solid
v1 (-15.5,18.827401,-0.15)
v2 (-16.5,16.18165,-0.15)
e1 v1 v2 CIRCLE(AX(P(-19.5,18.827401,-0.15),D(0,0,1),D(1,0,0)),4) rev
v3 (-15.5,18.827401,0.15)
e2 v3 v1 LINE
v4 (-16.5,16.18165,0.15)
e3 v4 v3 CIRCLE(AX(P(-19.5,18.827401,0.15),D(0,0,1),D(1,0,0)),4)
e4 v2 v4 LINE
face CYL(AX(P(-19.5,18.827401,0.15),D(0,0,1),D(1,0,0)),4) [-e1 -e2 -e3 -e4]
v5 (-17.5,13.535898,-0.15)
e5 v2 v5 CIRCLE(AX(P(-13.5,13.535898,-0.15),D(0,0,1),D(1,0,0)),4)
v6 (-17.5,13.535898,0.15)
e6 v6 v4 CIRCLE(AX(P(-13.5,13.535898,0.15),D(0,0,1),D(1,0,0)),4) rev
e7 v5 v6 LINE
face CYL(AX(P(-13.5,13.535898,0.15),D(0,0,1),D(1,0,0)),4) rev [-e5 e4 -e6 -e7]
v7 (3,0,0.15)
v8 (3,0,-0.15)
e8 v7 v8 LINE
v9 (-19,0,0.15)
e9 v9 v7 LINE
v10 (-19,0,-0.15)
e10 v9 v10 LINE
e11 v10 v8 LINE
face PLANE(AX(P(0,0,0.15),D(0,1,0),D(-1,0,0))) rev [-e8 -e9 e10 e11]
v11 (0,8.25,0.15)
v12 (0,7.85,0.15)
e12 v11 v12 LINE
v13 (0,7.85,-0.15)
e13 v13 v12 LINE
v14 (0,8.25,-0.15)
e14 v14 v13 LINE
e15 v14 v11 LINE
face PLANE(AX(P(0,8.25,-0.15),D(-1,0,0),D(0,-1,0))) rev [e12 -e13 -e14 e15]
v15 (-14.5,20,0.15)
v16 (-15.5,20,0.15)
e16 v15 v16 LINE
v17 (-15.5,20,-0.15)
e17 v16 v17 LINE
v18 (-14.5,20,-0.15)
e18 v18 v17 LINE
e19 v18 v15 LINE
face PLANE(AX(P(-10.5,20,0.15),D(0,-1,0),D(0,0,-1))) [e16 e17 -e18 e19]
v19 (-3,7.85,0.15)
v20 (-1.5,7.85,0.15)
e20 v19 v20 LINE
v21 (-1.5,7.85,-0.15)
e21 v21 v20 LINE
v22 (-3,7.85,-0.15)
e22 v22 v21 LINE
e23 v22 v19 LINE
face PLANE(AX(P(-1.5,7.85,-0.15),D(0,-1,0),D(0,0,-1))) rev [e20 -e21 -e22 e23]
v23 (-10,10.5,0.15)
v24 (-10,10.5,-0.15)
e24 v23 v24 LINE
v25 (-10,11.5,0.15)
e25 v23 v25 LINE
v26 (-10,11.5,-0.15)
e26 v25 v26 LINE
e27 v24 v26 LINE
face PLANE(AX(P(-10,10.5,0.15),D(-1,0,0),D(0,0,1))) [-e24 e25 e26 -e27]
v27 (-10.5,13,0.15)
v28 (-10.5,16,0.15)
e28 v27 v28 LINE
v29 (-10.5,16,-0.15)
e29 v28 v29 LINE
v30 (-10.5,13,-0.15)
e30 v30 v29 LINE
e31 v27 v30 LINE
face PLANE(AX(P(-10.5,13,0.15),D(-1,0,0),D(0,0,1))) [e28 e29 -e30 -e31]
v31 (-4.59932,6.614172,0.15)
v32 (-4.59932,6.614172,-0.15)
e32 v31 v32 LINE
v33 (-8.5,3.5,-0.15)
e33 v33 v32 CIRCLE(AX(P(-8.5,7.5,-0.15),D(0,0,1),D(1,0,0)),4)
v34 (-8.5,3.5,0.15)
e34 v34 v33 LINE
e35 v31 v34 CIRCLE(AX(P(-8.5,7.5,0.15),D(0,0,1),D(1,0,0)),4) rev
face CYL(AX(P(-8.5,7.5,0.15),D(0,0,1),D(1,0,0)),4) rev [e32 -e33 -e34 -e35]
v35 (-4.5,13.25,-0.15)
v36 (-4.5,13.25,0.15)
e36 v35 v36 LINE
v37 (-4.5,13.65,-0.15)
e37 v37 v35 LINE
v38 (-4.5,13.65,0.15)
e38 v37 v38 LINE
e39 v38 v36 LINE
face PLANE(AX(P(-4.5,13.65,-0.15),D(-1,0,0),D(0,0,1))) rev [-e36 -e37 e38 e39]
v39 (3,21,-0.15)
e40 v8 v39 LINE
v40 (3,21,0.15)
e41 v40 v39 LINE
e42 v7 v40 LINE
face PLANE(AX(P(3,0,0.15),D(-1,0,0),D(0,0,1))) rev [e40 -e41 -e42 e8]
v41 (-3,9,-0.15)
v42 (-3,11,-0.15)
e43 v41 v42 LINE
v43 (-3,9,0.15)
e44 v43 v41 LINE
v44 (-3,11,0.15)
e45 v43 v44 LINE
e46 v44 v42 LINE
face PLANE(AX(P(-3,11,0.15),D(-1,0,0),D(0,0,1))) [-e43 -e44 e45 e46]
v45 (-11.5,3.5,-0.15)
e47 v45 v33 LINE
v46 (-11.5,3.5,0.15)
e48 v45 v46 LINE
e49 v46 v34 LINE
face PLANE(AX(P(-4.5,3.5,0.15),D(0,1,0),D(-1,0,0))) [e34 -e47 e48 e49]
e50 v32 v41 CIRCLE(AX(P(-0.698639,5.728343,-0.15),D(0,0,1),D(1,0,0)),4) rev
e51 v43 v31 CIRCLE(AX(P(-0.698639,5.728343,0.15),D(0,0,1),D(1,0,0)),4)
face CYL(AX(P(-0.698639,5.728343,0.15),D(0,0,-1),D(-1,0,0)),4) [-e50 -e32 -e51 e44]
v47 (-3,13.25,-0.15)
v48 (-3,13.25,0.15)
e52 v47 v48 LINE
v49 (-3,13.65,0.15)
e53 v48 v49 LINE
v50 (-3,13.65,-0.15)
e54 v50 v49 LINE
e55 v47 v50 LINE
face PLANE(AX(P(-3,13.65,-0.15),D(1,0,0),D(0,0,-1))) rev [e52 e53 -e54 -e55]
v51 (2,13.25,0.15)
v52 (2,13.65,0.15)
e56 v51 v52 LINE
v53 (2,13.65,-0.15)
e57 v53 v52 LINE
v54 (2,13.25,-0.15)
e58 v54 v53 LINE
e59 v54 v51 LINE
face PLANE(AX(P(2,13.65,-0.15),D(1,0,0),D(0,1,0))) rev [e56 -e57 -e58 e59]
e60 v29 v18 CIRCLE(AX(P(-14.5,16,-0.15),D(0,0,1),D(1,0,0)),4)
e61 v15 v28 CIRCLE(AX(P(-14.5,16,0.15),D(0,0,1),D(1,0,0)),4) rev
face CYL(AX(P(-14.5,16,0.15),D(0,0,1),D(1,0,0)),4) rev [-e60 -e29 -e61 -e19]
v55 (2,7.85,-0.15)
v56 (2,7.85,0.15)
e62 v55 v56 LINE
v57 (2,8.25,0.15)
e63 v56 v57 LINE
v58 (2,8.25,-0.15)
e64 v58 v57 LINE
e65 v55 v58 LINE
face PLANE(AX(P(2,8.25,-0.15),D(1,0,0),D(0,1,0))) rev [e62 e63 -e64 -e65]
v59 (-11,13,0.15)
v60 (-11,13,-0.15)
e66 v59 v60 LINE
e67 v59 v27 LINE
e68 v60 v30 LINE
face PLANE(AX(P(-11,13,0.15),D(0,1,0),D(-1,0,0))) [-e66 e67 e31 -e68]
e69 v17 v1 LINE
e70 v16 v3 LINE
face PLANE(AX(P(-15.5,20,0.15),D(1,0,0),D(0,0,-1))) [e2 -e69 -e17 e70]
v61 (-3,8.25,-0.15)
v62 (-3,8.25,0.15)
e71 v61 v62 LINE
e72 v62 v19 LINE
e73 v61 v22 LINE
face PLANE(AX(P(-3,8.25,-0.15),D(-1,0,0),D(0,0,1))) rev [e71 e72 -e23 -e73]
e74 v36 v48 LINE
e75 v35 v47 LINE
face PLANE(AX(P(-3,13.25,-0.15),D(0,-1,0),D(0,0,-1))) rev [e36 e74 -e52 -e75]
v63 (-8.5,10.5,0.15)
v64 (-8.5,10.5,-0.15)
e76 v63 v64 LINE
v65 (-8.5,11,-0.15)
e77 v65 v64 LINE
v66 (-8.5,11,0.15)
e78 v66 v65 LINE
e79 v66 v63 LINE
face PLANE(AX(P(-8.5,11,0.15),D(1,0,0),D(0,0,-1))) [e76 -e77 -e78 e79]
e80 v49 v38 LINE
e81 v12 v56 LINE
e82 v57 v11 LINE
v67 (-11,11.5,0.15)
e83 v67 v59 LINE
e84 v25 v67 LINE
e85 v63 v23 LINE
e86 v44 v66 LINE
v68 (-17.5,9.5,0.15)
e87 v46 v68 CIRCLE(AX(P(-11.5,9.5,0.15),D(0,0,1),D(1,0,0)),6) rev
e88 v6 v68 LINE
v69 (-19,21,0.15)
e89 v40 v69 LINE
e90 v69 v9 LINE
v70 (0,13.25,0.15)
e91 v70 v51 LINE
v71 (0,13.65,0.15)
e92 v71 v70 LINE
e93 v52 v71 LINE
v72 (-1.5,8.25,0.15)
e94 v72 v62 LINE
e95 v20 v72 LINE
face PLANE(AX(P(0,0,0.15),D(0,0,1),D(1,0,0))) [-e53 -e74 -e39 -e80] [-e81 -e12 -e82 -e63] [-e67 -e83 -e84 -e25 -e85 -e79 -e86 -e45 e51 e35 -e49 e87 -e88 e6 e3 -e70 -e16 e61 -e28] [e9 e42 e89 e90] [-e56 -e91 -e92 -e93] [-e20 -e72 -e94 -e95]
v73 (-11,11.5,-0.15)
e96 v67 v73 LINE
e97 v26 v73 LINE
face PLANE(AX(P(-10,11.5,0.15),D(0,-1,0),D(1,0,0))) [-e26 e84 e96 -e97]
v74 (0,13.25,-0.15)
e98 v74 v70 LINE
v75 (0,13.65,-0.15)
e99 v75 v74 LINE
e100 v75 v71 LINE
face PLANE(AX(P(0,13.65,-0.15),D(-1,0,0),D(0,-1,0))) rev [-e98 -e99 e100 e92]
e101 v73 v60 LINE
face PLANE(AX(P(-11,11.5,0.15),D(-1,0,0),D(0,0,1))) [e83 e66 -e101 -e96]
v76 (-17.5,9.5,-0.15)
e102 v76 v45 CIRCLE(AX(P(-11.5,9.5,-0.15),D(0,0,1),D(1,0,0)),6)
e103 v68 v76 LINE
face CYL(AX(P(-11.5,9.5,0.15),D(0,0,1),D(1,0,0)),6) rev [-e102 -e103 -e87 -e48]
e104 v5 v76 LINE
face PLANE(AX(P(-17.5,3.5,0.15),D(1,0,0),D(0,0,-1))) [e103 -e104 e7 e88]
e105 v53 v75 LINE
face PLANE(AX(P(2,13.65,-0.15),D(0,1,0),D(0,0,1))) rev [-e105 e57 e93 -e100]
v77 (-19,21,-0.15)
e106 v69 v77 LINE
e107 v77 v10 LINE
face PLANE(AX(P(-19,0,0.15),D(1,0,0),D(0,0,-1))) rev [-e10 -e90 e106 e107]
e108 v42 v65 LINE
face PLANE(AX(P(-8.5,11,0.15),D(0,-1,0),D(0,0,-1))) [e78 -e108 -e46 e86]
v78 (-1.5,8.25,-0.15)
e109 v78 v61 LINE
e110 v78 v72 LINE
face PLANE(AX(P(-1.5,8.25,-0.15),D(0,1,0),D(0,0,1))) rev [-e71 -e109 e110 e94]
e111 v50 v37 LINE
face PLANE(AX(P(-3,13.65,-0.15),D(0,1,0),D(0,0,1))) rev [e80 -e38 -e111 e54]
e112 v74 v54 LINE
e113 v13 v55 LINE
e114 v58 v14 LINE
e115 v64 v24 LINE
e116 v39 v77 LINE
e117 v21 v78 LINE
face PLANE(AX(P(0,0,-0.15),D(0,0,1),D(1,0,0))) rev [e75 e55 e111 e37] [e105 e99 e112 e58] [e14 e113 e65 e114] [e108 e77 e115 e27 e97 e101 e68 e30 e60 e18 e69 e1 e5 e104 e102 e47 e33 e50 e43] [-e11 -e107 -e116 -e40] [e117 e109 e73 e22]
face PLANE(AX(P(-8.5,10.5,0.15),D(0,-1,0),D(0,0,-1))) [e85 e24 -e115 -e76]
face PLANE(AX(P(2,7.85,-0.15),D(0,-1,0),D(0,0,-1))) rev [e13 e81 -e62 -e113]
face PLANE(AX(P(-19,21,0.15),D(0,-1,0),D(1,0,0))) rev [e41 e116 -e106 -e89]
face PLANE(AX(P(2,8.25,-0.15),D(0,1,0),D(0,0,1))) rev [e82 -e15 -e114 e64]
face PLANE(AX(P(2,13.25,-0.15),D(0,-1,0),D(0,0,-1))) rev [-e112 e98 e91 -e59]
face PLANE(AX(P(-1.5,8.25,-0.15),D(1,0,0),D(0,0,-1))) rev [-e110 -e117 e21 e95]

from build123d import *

# Parameters (mm, degrees)
BOSS_EXTRUDE1_DEPTH = 0.15
FILLET3_R           = 6
FILLET4_R           = 4
FILLET5_R           = 4
FILLET7_R           = 4
SKETCH3_W           = 2
SKETCH3_H           = 0.4
SKETCH3_W_2         = 1.5
CUT_EXTRUDE1_DEPTH  = 29.321193478


with BuildPart() as part:
    # Sketch1 → Boss-Extrude1 (new, symmetric)
    with BuildSketch(Plane.XY):
        Polygon((0, 0), (-19, 0), (-19, 21), (0, 21), (3, 21), (3, 0), align=None)
        Polygon((-8.5, 11), (-3, 11), (-3, 9), (-4.5, 9), (-4.5, 3.5), (-17.5, 3.5), (-17.5, 17), (-15.5, 17), (-15.5, 20), (-10.5, 20), (-10.5, 13), (-11, 13), (-11, 11.5), (-10, 11.5), (-10, 10.5), (-8.5, 10.5), align=None, mode=Mode.SUBTRACT)
    extrude(amount=BOSS_EXTRUDE1_DEPTH, both=True)

    # Fillet3
    fillet3_edges = [part.edges().sort_by_distance(p)[0] for p in [
        (-17.5, 3.5, 0),
    ]]
    fillet(fillet3_edges, radius=FILLET3_R)

    # Fillet4
    # the kernel refuses this fillet: 4 mm, written as the material it adds along each edge
    with BuildSketch(Plane(origin=(-17.5, 17, 0.15), x_dir=(0, -1, 0), z_dir=(0, 0, -1))) as fillet4_piece_1:
        with BuildLine():
            CenterArc((3.464101615, -4), FILLET4_R, 90, 60)
            Line((0, -2), (-0.069282032, -1.96))
            ThreePointArc((-0.069282032, -1.96), (-0.08, -1), (-0.08, 0))
            Line((-0.08, 0), (0, 0.08))
            Line((0, 0.08), (3.464101615, 0.08))
            Line((3.464101615, 0.08), (3.464101615, 0))
        make_face()
    extrude(amount=0.3)
    with BuildSketch(Plane(origin=(-4.5, 3.5, 0.15), x_dir=(-1, 0, 0), z_dir=(0, 0, -1))) as fillet4_piece_2:
        with BuildLine():
            CenterArc((FILLET4_R, FILLET4_R), FILLET4_R, 180, 90)
            Line((0, FILLET4_R), (-FILLET4_R * 0.02, FILLET4_R))
            Line((-FILLET4_R * 0.02, FILLET4_R), (-FILLET4_R * 0.02, -FILLET4_R * 0.02))
            Line((-FILLET4_R * 0.02, -FILLET4_R * 0.02), (FILLET4_R, -FILLET4_R * 0.02))
            Line((FILLET4_R, -FILLET4_R * 0.02), (FILLET4_R, 0))
        make_face()
    extrude(amount=0.3)

    # Fillet5
    # the kernel refuses this fillet: 4 mm, written as the material it takes off along each edge
    with BuildSketch(Plane(origin=(-15.5, 17, 4.718502517), x_dir=(0, 1, 0), z_dir=(0, 0, -1))) as fillet5_piece_1:
        with BuildLine():
            CenterArc((1.827401007, -4), FILLET5_R, 90, 41.409622109)
            Line((-0.818350304, -1), (-0.87126533, -0.94))
            ThreePointArc((-0.87126533, -0.94), (-0.430439522, -0.482598297), (-0.069282032, 0.04))
            Line((-0.069282032, 0.04), (0, 0.08))
            Line((0, 0.08), (1.827401007, 0.08))
            Line((1.827401007, 0.08), (1.827401007, 0))
        make_face()
    extrude(amount=9.437005035, mode=Mode.SUBTRACT)
    with BuildSketch(Plane(origin=(-4.5, 9, 6.119736906), x_dir=(-0.041592927859064134, -0.9991346397518759, 0), z_dir=(0, 0, -1))) as fillet5_piece_2:
        with BuildLine():
            CenterArc((3.110715854, -3.934149167), FILLET5_R, 100.410842639, 42.081908104)
            Line((-0.062389392, -1.49870196), (-0.379699916, -1.255157239))
            ThreePointArc((-0.379699916, -1.255157239), (-0.430848552, -0.732713809), (-0.399653856, 0.016637171))
            Line((-0.399653856, 0.016637171), (0.016637171, 0.399653856))
            ThreePointArc((0.016637171, 0.399653856), (1.515339131, 0.337264464), (2.315612653, 0.393414917))
            Line((2.315612653, 0.393414917), (2.387894762, 0))
        make_face()
    extrude(amount=12.239473812, mode=Mode.SUBTRACT)

    # Fillet7
    fillet7_edges = [part.edges().sort_by_distance(p)[0] for p in [
        (-10.5, 20, 0),
    ]]
    fillet(fillet7_edges, radius=FILLET7_R)

    # Sketch3 → Cut-Extrude1 (cut, through all)
    with BuildSketch(Plane.XY.offset(0.15)):
        with Locations((1, 8.05)):
            Rectangle(SKETCH3_W, SKETCH3_H)
        with Locations((-2.25, 8.05)):
            Rectangle(SKETCH3_W_2, SKETCH3_H)
        with Locations((1, 13.45)):
            Rectangle(SKETCH3_W, SKETCH3_H)
        with Locations((-3.75, 13.45)):
            Rectangle(SKETCH3_W_2, SKETCH3_H)
    extrude(amount=-CUT_EXTRUDE1_DEPTH, mode=Mode.SUBTRACT)


solid = part.part
